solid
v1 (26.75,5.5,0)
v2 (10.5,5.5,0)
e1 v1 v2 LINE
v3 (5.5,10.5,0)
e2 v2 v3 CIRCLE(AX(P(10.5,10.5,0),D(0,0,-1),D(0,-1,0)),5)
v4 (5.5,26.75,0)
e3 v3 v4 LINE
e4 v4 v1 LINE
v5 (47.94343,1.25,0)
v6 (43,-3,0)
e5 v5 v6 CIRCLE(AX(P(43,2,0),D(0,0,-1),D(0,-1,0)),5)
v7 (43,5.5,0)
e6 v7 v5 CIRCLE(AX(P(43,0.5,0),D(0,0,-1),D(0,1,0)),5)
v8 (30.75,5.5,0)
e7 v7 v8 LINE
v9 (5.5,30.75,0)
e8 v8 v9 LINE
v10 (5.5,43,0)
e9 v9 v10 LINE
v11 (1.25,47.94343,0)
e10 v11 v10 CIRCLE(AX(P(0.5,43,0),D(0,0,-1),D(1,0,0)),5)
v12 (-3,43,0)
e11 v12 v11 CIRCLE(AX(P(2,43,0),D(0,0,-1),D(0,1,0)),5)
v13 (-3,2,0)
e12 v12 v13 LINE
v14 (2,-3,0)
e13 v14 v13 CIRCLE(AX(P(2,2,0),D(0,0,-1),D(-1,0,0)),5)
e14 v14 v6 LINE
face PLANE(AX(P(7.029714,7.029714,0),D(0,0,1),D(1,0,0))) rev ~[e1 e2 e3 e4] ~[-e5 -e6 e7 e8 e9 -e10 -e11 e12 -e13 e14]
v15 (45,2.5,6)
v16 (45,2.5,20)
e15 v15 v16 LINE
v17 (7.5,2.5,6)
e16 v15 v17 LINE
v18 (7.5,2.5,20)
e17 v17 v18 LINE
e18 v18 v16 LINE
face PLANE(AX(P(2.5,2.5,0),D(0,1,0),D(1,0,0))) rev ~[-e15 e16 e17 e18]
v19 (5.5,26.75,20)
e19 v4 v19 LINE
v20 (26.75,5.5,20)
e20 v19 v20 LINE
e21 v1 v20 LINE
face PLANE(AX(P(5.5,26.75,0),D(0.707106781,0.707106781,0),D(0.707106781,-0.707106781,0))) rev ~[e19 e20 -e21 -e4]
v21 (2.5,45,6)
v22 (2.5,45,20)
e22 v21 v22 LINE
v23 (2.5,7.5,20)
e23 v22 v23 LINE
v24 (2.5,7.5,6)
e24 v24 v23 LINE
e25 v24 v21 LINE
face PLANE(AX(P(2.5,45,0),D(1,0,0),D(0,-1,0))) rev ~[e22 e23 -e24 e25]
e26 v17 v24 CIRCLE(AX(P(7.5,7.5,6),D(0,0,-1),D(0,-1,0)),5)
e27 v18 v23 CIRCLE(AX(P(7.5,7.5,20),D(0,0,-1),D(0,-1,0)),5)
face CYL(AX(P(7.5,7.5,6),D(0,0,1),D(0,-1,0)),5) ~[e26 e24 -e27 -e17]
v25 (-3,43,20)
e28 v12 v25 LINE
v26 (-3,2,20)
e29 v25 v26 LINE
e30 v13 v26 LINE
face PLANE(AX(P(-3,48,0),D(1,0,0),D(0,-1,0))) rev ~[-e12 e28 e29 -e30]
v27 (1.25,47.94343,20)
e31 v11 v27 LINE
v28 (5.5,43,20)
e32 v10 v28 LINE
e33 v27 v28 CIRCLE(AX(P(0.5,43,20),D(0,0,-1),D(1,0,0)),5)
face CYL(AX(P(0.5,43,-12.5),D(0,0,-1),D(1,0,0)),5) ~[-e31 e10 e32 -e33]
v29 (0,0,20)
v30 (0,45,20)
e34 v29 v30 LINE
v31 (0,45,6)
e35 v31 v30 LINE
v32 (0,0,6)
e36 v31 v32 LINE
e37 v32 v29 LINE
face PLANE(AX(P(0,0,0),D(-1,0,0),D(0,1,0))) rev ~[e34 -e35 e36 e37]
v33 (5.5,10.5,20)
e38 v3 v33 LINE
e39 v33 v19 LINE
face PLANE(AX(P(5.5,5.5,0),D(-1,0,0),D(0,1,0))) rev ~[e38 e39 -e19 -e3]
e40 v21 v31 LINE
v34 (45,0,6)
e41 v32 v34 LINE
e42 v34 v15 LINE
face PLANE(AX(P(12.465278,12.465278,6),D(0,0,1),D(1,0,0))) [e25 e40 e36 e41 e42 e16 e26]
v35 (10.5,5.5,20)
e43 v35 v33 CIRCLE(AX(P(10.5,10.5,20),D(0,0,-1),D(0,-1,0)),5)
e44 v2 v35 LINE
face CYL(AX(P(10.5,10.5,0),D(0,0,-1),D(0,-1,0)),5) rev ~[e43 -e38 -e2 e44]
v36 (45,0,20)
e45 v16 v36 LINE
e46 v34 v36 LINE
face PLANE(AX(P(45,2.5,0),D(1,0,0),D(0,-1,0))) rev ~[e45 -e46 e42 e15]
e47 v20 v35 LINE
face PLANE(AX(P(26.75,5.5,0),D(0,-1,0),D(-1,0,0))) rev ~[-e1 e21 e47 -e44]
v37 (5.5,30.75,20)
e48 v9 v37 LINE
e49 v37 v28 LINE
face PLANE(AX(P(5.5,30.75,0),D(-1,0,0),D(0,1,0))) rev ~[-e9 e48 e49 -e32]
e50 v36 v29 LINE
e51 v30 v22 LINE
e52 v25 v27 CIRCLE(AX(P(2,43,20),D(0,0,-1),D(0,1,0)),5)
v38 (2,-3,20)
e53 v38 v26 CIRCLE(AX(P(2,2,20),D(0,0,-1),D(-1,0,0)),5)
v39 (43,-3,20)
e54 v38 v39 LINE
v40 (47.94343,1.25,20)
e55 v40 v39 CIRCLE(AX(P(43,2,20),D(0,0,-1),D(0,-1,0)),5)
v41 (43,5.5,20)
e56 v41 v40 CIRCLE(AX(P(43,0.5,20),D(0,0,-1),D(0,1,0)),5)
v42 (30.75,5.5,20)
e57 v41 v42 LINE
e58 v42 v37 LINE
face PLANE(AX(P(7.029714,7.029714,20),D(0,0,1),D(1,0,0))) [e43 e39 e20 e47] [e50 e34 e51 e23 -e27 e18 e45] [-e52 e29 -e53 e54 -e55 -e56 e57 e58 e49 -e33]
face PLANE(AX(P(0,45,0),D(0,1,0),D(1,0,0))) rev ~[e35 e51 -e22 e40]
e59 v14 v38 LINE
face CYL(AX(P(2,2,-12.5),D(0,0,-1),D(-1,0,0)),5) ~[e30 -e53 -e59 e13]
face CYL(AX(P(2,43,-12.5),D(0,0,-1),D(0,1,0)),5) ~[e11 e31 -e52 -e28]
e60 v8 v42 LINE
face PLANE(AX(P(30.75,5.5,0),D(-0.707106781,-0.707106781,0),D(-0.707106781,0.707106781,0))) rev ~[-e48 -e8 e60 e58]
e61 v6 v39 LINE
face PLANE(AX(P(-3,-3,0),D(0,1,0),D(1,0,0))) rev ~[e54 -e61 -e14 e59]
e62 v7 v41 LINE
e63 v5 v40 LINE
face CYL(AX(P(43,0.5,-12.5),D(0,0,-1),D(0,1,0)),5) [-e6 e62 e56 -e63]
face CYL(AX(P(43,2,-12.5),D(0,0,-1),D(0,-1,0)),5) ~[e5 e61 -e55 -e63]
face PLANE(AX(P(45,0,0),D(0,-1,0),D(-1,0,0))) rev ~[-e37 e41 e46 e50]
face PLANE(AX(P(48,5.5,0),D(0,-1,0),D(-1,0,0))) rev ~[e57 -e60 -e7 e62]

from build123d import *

# Parameters (mm, degrees)
F1_DEPTH    = 20
F2_DEPTH    = 6
F3_T1_DEPTH = 20
F3_T3_DEPTH = 45
F4_R        = 5


# Not quite as in the source:
# - a fillet or chamfer that OpenCascade refuses, or shapes differently, is made with other operations: its cross-section is extruded or revolved along the edge and cut away or added


with BuildPart() as f1:
    # F0 (on Top) → F1 (new body)
    with BuildSketch(Plane.XY):
        Polygon((5.5, 30.75), (5.5, 48), (-3, 48), (-3, -3), (48, -3), (48, 5.5), (30.75, 5.5), (26.75, 5.5), (5.5, 5.5), (5.5, 26.75), align=None)
        Polygon((0, 0), (0, 45), (2.5, 45), (2.5, 2.5), (45, 2.5), (45, 0), align=None, mode=Mode.SUBTRACT)
        Polygon((30.75, 5.5), (5.5, 30.75), (5.5, 26.75), (26.75, 5.5), align=None)
    extrude(amount=F1_DEPTH)

    # F0 (on Top) → F2 (join)
    with BuildSketch(Plane.XY):
        Polygon((2.5, 45), (0, 45), (0, 0), (45, 0), (45, 2.5), (2.5, 2.5), align=None)
    extrude(amount=F2_DEPTH)

    # F3: fillet of radius 5 on 6 edges, made by hand

    # F3_s2 → F3_t1 (join)
    with BuildSketch(Plane.XY):
        with BuildLine():
            ThreePointArc((10.5, 5.5), (6.9644660941, 6.9644660941), (5.5, 10.5))
            Line((5.5, 10.5), (5.5, 5.5))
            Line((5.5, 5.5), (10.5, 5.5))
        make_face()
    extrude(amount=F3_T1_DEPTH)

    # F3_s4 → F3_t3 (cut)
    with BuildSketch(Plane.XY.offset(-12.5)):
        with BuildLine():
            ThreePointArc((43, 5.5), (46.5355339059, 4.0355339059), (48, 0.5))
            Line((48, 0.5), (48, 5.5))
            Line((48, 5.5), (43, 5.5))
        make_face()
        with BuildLine():
            ThreePointArc((43, -3), (46.5355339059, -1.5355339059), (48, 2))
            Line((48, 2), (48, -3))
            Line((48, -3), (43, -3))
        make_face()
        with BuildLine():
            ThreePointArc((5.5, 43), (4.0355339059, 46.5355339059), (0.5, 48))
            Line((0.5, 48), (5.5, 48))
            Line((5.5, 48), (5.5, 43))
        make_face()
        with BuildLine():
            ThreePointArc((2, 48), (-1.5355339059, 46.5355339059), (-3, 43))
            Line((-3, 43), (-3, 48))
            Line((-3, 48), (2, 48))
        make_face()
        with BuildLine():
            ThreePointArc((-3, 2), (-1.5355339059, -1.5355339059), (2, -3))
            Line((2, -3), (-3, -3))
            Line((-3, -3), (-3, 2))
        make_face()
    extrude(amount=F3_T3_DEPTH, mode=Mode.SUBTRACT)

    # F4
    f4_edges = [f1.edges().sort_by_distance(p)[0] for p in [
        (2.5, 2.5, 13),
    ]]
    fillet(f4_edges, radius=F4_R)


solid = f1.part
